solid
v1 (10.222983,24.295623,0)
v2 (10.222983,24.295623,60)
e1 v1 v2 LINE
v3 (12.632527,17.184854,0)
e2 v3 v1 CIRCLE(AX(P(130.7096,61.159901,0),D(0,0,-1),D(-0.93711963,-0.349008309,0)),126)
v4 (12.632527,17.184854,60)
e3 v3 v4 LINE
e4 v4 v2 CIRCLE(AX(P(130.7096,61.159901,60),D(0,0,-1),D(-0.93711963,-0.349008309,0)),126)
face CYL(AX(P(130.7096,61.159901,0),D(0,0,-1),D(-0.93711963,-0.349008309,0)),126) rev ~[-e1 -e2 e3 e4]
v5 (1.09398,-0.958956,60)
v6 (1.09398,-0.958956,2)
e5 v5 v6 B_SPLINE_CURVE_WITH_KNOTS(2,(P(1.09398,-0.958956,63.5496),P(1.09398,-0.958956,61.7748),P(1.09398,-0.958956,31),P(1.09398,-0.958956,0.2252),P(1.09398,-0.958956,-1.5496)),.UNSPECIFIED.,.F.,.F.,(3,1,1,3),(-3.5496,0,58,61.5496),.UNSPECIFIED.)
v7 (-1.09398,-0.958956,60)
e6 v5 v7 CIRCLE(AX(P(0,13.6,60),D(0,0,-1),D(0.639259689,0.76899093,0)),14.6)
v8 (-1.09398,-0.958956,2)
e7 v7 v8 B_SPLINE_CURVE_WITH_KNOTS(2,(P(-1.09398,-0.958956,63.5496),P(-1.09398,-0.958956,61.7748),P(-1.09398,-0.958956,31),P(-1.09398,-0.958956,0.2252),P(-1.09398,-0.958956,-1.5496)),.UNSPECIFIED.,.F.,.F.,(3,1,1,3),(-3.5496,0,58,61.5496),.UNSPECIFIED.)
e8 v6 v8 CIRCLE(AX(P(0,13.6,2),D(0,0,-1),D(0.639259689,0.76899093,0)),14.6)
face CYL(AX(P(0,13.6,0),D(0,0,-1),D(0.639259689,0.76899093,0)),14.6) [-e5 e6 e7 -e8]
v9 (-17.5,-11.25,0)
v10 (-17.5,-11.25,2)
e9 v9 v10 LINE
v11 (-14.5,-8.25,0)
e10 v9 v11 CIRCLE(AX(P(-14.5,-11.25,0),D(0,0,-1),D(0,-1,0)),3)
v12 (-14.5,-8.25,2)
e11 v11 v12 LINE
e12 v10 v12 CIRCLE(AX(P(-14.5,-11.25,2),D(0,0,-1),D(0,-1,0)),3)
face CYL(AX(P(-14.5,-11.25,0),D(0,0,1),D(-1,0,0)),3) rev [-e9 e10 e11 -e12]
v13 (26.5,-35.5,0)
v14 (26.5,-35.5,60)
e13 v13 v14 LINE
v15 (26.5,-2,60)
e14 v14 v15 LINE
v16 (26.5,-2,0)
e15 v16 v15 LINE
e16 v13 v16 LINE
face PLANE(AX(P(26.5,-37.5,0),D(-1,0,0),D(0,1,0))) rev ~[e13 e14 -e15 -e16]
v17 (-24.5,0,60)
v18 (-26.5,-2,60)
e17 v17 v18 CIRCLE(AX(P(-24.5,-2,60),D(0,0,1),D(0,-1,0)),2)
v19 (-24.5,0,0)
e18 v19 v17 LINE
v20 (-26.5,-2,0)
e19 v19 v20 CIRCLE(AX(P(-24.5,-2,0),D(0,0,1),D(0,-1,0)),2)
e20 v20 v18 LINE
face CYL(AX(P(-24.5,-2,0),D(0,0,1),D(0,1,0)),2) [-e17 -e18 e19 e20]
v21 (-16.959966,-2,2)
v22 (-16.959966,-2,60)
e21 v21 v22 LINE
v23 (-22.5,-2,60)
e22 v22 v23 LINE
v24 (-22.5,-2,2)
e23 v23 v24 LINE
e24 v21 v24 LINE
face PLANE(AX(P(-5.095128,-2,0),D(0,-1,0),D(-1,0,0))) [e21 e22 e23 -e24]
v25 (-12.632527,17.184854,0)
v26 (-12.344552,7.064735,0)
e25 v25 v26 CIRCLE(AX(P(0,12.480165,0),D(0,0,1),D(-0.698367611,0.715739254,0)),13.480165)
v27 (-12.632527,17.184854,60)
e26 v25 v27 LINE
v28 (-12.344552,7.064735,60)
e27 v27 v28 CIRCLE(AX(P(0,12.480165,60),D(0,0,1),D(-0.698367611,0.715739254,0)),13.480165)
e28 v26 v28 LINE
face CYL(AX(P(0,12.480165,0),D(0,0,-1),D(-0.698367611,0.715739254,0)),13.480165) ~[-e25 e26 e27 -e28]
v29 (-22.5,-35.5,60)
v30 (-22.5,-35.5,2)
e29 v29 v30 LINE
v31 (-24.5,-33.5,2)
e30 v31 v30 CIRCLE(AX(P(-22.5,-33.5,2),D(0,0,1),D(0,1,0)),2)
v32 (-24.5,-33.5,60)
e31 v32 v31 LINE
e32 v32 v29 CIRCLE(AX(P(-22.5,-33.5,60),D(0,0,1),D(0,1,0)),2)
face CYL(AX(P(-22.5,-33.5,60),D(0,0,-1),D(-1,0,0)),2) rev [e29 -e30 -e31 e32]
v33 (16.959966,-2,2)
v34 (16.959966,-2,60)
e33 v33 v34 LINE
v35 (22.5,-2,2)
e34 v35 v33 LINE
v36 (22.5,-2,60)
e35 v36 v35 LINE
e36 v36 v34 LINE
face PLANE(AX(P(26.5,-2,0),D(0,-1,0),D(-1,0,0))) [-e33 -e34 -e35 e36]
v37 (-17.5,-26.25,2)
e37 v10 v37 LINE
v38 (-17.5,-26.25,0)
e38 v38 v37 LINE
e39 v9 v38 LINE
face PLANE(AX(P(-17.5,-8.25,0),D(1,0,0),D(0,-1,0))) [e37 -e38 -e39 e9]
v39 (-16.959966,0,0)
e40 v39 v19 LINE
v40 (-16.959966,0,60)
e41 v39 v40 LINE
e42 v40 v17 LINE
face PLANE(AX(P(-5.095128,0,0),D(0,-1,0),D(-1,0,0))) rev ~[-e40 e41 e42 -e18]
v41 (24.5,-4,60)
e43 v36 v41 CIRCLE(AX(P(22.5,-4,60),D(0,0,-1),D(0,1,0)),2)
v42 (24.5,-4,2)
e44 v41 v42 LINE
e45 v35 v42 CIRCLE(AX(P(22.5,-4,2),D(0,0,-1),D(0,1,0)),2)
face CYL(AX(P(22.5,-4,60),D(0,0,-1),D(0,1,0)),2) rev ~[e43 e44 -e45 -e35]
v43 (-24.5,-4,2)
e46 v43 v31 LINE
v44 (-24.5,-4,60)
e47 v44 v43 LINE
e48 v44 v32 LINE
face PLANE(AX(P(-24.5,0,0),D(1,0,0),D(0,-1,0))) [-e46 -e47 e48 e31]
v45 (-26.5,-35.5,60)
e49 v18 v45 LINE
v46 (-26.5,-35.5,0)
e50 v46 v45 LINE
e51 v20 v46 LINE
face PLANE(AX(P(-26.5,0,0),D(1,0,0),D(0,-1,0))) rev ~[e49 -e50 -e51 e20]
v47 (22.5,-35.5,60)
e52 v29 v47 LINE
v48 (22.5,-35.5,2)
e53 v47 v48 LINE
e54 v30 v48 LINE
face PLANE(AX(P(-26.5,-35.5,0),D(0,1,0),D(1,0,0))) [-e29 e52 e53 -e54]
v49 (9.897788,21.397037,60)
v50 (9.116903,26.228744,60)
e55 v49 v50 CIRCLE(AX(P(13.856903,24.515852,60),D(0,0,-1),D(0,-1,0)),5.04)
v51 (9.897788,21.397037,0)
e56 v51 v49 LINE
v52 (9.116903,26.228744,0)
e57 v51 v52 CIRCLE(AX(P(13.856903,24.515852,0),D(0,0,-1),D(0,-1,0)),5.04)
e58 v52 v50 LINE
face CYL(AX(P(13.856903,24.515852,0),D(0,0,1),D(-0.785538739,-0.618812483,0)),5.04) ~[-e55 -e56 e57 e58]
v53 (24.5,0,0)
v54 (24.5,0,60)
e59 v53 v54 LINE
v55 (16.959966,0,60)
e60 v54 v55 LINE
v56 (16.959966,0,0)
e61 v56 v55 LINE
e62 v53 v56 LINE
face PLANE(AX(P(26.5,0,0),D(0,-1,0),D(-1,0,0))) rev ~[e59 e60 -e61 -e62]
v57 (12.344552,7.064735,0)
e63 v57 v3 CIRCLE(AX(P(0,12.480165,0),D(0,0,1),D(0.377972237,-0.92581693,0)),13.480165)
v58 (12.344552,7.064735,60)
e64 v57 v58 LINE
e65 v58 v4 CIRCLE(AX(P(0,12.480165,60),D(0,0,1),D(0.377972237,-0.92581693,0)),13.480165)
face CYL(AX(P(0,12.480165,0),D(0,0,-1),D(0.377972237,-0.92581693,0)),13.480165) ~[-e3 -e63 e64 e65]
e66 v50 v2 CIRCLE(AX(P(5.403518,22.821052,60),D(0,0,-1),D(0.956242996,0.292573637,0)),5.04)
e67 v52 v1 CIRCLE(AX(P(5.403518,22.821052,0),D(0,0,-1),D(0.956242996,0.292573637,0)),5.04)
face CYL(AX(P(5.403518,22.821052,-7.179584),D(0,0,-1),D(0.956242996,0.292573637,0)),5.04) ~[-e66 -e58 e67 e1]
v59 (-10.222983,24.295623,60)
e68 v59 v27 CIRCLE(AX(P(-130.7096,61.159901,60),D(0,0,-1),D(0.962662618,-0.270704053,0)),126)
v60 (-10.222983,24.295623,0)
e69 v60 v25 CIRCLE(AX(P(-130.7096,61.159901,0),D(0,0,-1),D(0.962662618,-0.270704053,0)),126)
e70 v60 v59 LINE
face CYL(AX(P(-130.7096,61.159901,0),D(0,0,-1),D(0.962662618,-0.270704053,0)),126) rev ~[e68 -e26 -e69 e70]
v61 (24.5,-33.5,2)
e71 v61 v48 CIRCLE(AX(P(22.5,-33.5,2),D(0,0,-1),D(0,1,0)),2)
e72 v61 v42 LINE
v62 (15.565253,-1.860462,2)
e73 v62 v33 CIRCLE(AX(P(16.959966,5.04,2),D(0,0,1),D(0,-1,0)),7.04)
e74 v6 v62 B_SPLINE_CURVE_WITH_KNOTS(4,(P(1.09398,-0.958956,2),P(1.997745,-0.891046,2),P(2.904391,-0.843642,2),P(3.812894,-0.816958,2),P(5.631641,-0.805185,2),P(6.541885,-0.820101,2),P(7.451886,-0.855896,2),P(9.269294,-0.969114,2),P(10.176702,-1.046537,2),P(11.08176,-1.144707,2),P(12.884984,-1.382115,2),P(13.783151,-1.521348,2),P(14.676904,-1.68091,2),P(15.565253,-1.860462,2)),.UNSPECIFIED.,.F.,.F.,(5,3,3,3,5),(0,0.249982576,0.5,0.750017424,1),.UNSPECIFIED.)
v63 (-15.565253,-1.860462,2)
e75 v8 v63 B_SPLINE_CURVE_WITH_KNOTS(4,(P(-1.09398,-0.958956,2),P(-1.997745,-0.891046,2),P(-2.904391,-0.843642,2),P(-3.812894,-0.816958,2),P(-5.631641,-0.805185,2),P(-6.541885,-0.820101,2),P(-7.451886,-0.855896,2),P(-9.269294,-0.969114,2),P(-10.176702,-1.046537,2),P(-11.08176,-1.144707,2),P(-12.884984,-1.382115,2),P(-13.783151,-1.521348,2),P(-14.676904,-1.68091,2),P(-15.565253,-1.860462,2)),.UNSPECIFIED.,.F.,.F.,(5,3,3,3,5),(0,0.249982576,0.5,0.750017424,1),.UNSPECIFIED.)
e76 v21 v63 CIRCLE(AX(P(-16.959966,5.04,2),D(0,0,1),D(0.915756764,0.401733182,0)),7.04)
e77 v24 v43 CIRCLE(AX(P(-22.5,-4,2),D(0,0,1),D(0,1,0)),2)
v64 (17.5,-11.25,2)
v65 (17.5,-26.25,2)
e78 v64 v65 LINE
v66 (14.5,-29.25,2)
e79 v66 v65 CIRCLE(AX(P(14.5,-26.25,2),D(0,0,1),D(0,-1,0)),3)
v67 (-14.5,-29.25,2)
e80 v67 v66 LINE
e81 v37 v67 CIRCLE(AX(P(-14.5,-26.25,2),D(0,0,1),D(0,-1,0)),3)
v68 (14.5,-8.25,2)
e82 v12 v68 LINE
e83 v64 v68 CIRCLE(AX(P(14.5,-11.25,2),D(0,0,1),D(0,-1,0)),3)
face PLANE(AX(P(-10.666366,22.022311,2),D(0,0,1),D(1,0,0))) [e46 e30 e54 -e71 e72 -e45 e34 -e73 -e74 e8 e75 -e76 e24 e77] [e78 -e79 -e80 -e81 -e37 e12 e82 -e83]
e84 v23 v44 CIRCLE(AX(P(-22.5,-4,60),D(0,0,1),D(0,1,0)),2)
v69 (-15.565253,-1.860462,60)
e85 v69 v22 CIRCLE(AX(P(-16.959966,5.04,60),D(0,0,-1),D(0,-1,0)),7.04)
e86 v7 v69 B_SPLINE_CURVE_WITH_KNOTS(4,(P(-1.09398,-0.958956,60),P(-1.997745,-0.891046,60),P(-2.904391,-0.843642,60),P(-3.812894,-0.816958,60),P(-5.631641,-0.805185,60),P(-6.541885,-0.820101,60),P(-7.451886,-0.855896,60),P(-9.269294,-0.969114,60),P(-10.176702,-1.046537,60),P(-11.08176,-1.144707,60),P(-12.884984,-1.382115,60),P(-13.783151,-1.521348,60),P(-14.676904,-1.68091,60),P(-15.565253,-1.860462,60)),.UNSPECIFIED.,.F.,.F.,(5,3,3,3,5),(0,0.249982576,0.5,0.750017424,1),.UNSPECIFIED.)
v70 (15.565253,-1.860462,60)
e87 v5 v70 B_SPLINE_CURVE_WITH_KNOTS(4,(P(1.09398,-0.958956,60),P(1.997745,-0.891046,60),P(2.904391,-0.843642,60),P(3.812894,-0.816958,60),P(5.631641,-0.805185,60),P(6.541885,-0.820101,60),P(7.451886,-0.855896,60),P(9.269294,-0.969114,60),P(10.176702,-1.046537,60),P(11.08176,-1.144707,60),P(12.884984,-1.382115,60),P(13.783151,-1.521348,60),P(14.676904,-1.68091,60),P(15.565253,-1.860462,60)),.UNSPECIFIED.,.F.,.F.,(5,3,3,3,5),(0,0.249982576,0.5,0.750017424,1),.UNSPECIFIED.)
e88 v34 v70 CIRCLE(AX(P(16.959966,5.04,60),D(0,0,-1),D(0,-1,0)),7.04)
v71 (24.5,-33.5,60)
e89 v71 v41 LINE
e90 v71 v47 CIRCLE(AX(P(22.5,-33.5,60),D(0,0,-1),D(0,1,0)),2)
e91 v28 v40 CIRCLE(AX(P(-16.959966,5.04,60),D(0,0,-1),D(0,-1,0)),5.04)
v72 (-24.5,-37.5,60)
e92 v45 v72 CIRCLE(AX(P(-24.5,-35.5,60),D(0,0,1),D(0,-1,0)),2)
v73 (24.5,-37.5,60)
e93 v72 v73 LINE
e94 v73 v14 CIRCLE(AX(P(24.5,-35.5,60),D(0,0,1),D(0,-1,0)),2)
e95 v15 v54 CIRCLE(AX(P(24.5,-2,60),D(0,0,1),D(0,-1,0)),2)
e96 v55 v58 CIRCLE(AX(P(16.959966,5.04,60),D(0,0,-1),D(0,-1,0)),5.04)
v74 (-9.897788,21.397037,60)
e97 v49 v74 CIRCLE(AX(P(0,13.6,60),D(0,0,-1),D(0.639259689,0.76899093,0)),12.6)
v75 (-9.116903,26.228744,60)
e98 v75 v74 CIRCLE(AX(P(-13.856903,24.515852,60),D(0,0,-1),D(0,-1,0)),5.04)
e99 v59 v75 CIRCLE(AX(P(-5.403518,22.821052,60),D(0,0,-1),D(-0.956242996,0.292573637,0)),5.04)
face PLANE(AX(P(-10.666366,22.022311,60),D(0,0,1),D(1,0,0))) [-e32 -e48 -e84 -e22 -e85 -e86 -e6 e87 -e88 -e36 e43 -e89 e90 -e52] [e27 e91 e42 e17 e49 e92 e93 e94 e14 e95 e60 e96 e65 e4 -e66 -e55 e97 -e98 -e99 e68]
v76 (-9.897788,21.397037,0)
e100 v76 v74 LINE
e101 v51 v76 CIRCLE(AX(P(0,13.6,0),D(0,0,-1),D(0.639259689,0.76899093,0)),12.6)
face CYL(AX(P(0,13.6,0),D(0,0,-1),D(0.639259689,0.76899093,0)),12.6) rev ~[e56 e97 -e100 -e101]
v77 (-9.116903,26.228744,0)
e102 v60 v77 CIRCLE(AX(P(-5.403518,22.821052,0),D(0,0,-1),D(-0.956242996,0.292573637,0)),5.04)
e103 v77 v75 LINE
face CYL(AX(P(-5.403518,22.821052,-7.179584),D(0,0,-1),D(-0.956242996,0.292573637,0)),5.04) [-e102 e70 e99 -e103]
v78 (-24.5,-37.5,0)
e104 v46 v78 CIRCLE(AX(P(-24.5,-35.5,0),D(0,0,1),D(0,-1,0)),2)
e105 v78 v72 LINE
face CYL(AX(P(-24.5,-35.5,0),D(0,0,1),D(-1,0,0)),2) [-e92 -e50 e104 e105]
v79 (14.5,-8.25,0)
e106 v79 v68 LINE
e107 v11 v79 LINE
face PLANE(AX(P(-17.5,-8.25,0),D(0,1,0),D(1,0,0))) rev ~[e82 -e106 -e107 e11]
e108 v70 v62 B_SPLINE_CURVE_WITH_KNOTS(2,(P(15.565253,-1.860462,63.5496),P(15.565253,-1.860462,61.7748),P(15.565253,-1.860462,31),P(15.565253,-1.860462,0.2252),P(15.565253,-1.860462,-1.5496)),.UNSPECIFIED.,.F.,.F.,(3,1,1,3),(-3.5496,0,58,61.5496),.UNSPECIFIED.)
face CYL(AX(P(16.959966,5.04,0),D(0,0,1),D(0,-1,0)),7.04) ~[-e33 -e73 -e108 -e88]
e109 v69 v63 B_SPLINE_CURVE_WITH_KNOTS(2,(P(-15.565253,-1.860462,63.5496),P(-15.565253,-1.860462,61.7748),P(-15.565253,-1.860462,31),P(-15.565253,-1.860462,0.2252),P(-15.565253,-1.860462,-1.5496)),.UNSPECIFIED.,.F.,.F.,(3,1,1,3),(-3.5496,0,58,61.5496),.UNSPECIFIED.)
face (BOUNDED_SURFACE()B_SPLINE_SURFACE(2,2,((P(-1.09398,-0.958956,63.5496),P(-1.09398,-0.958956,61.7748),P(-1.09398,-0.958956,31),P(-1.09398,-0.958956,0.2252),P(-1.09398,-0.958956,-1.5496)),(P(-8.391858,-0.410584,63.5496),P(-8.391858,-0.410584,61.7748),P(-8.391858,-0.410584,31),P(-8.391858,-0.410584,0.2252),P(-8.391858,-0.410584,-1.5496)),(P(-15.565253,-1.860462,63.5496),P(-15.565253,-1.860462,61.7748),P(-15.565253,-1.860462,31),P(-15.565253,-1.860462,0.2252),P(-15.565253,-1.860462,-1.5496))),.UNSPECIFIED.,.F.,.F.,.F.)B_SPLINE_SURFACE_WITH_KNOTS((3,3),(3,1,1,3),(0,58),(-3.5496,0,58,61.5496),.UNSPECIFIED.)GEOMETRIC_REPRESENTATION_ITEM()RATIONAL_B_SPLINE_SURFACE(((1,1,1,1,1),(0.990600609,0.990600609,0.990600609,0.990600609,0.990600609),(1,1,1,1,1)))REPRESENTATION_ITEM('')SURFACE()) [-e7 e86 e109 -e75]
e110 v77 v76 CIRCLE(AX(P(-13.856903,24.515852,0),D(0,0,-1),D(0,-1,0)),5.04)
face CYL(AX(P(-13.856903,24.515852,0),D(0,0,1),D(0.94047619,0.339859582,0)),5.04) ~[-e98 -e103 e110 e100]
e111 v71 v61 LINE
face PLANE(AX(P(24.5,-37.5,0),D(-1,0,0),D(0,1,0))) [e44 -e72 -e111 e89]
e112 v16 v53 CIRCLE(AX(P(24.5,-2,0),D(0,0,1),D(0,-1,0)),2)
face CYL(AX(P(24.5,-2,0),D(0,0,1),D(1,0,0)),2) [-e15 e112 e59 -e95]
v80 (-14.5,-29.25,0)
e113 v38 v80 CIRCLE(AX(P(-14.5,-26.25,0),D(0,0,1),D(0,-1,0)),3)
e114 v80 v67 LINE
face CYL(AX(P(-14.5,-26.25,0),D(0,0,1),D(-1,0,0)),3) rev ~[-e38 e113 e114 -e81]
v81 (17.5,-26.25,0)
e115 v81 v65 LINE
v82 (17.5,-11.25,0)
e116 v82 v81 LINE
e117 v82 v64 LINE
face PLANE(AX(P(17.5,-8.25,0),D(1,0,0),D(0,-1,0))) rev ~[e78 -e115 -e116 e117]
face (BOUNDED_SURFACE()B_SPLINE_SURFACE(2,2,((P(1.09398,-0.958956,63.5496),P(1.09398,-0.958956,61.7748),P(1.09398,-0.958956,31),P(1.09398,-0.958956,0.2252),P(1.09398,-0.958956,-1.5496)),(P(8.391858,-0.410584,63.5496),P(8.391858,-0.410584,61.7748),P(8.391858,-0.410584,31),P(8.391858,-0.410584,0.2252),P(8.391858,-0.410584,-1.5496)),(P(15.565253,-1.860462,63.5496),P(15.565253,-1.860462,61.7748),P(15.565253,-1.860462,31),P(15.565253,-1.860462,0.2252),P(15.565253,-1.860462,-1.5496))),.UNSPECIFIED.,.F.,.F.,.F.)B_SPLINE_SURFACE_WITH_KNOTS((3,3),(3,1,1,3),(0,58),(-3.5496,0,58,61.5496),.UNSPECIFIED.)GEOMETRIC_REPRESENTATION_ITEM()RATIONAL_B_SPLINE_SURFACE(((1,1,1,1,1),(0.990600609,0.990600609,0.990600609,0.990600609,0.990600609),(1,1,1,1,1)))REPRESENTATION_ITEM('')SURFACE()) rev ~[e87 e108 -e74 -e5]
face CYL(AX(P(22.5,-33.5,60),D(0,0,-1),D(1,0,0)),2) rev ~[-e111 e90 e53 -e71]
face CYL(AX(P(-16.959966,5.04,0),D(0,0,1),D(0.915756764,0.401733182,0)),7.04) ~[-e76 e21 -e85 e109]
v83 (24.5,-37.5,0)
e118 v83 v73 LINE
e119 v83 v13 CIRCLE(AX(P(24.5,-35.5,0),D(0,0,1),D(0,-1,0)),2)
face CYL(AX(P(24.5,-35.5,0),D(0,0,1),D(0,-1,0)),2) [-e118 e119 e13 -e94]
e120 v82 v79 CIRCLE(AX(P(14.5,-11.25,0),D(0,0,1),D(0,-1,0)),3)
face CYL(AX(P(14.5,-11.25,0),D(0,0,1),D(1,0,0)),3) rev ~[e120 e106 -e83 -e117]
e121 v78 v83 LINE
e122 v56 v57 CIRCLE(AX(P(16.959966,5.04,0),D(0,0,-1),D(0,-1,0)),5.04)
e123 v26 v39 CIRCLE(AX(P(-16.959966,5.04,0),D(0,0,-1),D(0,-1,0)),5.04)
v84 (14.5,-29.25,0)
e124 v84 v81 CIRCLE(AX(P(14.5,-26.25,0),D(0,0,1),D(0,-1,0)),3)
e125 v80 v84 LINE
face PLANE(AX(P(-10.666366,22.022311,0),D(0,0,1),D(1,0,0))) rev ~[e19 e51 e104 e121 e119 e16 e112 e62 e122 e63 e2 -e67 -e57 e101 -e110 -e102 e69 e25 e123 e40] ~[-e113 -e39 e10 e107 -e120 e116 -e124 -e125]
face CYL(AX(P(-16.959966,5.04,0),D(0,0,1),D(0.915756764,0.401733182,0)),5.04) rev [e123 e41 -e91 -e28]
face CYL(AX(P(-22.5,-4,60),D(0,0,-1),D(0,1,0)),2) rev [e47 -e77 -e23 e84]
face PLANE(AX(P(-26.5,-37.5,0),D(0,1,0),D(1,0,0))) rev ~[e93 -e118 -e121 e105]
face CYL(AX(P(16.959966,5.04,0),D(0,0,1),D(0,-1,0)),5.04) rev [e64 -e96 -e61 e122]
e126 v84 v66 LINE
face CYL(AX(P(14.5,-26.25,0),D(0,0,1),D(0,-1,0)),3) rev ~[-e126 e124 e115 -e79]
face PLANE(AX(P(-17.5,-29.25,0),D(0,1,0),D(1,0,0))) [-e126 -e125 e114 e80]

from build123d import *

# Parameters (mm, degrees)
F4_W        = 53
F4_H        = 35.5
F5_DEPTH    = 60
F6_T1_DEPTH = 60
F7_R        = 5.04
F9_T1_DEPTH = 74.3591672048
F10_T       = -2
F12_R       = 53
F13_R       = 2
F11_W       = 35
F11_H       = 21
F14_DEPTH   = 2
F15_R       = 3


# Not quite as in the source:
# - a fillet or chamfer that OpenCascade refuses, or shapes differently, is made with other operations: its cross-section is extruded or revolved along the edge and cut away or added
# - two fillets or chamfers of one size are made in one step


with BuildPart() as f5:
    # F4 (on Top) → F5 (new body)
    with BuildSketch(Plane.XY):
        with BuildLine():
            Line((-26.5, 0), (-26.5, -2))
            Line((-26.5, -2), (26.5, -2))
            Line((26.5, -2), (26.5, 0))
            Line((26.5, 0), (5.0951280026, 0))
            ThreePointArc((5.0951280026, 0), (0, -1), (-5.0951280026, 0))
            Line((-5.0951280026, 0), (-26.5, 0))
        make_face()
        with Locations((0, -19.75)):
            Rectangle(F4_W, F4_H)
        with BuildLine():
            ThreePointArc((-9.414110408, 22.1284476932), (-13.2305158305, 9.8978613101), (-5.0951280026, 0))
            Line((-5.0951280026, 0), (5.0951280026, 0))
            ThreePointArc((5.0951280026, 0), (13.2305158305, 9.8978613101), (9.414110408, 22.1284476932))
            ThreePointArc((9.414110408, 22.1284476932), (8.753655045, 22.7314262234), (8.0546720819, 23.2892857143))
            ThreePointArc((8.0546720819, 23.2892857143), (0, 1), (-8.0546720819, 23.2892857143))
            ThreePointArc((-8.0546720819, 23.2892857143), (-8.753655045, 22.7314262234), (-9.414110408, 22.1284476932))
        make_face()
        with BuildLine():
            Line((5.0951280026, 0), (-5.0951280026, 0))
            ThreePointArc((-5.0951280026, 0), (0, -1), (5.0951280026, 0))
        make_face()
        with BuildLine():
            Line((-9.414110408, 27.0511904762), (-9.414110408, 22.1284476932))
            ThreePointArc((-9.414110408, 22.1284476932), (-8.753655045, 22.7314262234), (-8.0546720819, 23.2892857143))
            Line((-8.0546720819, 23.2892857143), (-9.414110408, 27.0511904762))
        make_face()
        with BuildLine():
            ThreePointArc((8.0546720819, 23.2892857143), (8.753655045, 22.7314262234), (9.414110408, 22.1284476932))
            Line((9.414110408, 22.1284476932), (9.414110408, 27.0511904762))
            Line((9.414110408, 27.0511904762), (8.0546720819, 23.2892857143))
        make_face()
    extrude(amount=F5_DEPTH)

    # F6: fillet of radius 126 on 2 edges, made by hand

    # F6_s2 → F6_t1 (join)
    with BuildSketch(Plane.XY):
        with BuildLine():
            ThreePointArc((-9.414110408, 27.0511904762), (-10.9216954082, 22.0848726308), (-12.632526933, 17.1848541647))
            ThreePointArc((-12.632526933, 17.1848541647), (-11.297049781, 19.8348574754), (-9.414110408, 22.1284476932))
            Line((-9.414110408, 22.1284476932), (-9.414110408, 27.0511904762))
        make_face()
        with BuildLine():
            ThreePointArc((12.632526933, 17.1848541647), (10.9216954082, 22.0848726308), (9.414110408, 27.0511904762))
            Line((9.414110408, 27.0511904762), (9.414110408, 22.1284476932))
            ThreePointArc((9.414110408, 22.1284476932), (11.297049781, 19.8348574754), (12.632526933, 17.1848541647))
        make_face()
    extrude(amount=F6_T1_DEPTH)

    # F7
    f7_edges = [f5.edges().sort_by_distance(p)[0] for p in [
        (-5.095128, 0, 30),
        (5.095128, 0, 30),
        (8.054672, 23.289286, 30),
        (-8.054672, 23.289286, 30),
    ]]
    fillet(f7_edges, radius=F7_R)

    # F9: fillet of radius 5.04 on 2 edges, made by hand

    # F9_s2 → F9_t1 (cut)
    with BuildSketch(Plane.XY.offset(-7.1795836024)):
        with BuildLine():
            ThreePointArc((10.2229827876, 24.2956228784), (9.778060574, 25.324045565), (9.116903363, 26.2287444879))
            Line((9.116903363, 26.2287444879), (9.414110408, 27.0511904762))
            ThreePointArc((9.414110408, 27.0511904762), (9.8106956175, 25.6711020918), (10.2229827876, 24.2956228784))
        make_face()
        with BuildLine():
            ThreePointArc((-10.2229827876, 24.2956228784), (-9.778060574, 25.324045565), (-9.116903363, 26.2287444879))
            Line((-9.116903363, 26.2287444879), (-9.414110408, 27.0511904762))
            ThreePointArc((-9.414110408, 27.0511904762), (-9.8106956175, 25.6711020918), (-10.2229827876, 24.2956228784))
        make_face()
    extrude(amount=F9_T1_DEPTH, mode=Mode.SUBTRACT)

    # F10
    f10_openings = [f5.faces().sort_by_distance(p)[0] for p in [
        (0, -17.249718, 60),
    ]]
    offset(amount=F10_T, openings=f10_openings)

    # F12
    f12_edges = [f5.edges().sort_by_distance(p)[0] for p in [
        (-10.182168, 3.136566, 31),
        (10.182168, 3.136566, 31),
    ]]
    fillet(f12_edges, radius=F12_R)

    # F13
    f13_edges = [f5.edges().sort_by_distance(p)[0] for p in [
        (-26.5, 0, 30),
        (26.5, 0, 30),
        (24.5, -35.5, 31),
        (-24.5, -35.5, 31),
        (26.5, -37.5, 30),
        (-26.5, -37.5, 30),
        (24.5, -2, 31),
        (-24.5, -2, 31),
    ]]
    fillet(f13_edges, radius=F13_R)

    # F11 (on face) → F14 (cut)
    with BuildSketch(Plane(origin=(0, 0, 0), x_dir=(1, 0, 0), z_dir=(0, 0, -1))):
        with Locations((0, 18.75)):
            Rectangle(F11_W, F11_H)
    extrude(amount=-F14_DEPTH, mode=Mode.SUBTRACT)

    # F15
    f15_edges = [f5.edges().sort_by_distance(p)[0] for p in [
        (17.5, -8.25, 1),
        (-17.5, -8.25, 1),
        (-17.5, -29.25, 1),
        (17.5, -29.25, 1),
    ]]
    fillet(f15_edges, radius=F15_R)


solid = f5.part
